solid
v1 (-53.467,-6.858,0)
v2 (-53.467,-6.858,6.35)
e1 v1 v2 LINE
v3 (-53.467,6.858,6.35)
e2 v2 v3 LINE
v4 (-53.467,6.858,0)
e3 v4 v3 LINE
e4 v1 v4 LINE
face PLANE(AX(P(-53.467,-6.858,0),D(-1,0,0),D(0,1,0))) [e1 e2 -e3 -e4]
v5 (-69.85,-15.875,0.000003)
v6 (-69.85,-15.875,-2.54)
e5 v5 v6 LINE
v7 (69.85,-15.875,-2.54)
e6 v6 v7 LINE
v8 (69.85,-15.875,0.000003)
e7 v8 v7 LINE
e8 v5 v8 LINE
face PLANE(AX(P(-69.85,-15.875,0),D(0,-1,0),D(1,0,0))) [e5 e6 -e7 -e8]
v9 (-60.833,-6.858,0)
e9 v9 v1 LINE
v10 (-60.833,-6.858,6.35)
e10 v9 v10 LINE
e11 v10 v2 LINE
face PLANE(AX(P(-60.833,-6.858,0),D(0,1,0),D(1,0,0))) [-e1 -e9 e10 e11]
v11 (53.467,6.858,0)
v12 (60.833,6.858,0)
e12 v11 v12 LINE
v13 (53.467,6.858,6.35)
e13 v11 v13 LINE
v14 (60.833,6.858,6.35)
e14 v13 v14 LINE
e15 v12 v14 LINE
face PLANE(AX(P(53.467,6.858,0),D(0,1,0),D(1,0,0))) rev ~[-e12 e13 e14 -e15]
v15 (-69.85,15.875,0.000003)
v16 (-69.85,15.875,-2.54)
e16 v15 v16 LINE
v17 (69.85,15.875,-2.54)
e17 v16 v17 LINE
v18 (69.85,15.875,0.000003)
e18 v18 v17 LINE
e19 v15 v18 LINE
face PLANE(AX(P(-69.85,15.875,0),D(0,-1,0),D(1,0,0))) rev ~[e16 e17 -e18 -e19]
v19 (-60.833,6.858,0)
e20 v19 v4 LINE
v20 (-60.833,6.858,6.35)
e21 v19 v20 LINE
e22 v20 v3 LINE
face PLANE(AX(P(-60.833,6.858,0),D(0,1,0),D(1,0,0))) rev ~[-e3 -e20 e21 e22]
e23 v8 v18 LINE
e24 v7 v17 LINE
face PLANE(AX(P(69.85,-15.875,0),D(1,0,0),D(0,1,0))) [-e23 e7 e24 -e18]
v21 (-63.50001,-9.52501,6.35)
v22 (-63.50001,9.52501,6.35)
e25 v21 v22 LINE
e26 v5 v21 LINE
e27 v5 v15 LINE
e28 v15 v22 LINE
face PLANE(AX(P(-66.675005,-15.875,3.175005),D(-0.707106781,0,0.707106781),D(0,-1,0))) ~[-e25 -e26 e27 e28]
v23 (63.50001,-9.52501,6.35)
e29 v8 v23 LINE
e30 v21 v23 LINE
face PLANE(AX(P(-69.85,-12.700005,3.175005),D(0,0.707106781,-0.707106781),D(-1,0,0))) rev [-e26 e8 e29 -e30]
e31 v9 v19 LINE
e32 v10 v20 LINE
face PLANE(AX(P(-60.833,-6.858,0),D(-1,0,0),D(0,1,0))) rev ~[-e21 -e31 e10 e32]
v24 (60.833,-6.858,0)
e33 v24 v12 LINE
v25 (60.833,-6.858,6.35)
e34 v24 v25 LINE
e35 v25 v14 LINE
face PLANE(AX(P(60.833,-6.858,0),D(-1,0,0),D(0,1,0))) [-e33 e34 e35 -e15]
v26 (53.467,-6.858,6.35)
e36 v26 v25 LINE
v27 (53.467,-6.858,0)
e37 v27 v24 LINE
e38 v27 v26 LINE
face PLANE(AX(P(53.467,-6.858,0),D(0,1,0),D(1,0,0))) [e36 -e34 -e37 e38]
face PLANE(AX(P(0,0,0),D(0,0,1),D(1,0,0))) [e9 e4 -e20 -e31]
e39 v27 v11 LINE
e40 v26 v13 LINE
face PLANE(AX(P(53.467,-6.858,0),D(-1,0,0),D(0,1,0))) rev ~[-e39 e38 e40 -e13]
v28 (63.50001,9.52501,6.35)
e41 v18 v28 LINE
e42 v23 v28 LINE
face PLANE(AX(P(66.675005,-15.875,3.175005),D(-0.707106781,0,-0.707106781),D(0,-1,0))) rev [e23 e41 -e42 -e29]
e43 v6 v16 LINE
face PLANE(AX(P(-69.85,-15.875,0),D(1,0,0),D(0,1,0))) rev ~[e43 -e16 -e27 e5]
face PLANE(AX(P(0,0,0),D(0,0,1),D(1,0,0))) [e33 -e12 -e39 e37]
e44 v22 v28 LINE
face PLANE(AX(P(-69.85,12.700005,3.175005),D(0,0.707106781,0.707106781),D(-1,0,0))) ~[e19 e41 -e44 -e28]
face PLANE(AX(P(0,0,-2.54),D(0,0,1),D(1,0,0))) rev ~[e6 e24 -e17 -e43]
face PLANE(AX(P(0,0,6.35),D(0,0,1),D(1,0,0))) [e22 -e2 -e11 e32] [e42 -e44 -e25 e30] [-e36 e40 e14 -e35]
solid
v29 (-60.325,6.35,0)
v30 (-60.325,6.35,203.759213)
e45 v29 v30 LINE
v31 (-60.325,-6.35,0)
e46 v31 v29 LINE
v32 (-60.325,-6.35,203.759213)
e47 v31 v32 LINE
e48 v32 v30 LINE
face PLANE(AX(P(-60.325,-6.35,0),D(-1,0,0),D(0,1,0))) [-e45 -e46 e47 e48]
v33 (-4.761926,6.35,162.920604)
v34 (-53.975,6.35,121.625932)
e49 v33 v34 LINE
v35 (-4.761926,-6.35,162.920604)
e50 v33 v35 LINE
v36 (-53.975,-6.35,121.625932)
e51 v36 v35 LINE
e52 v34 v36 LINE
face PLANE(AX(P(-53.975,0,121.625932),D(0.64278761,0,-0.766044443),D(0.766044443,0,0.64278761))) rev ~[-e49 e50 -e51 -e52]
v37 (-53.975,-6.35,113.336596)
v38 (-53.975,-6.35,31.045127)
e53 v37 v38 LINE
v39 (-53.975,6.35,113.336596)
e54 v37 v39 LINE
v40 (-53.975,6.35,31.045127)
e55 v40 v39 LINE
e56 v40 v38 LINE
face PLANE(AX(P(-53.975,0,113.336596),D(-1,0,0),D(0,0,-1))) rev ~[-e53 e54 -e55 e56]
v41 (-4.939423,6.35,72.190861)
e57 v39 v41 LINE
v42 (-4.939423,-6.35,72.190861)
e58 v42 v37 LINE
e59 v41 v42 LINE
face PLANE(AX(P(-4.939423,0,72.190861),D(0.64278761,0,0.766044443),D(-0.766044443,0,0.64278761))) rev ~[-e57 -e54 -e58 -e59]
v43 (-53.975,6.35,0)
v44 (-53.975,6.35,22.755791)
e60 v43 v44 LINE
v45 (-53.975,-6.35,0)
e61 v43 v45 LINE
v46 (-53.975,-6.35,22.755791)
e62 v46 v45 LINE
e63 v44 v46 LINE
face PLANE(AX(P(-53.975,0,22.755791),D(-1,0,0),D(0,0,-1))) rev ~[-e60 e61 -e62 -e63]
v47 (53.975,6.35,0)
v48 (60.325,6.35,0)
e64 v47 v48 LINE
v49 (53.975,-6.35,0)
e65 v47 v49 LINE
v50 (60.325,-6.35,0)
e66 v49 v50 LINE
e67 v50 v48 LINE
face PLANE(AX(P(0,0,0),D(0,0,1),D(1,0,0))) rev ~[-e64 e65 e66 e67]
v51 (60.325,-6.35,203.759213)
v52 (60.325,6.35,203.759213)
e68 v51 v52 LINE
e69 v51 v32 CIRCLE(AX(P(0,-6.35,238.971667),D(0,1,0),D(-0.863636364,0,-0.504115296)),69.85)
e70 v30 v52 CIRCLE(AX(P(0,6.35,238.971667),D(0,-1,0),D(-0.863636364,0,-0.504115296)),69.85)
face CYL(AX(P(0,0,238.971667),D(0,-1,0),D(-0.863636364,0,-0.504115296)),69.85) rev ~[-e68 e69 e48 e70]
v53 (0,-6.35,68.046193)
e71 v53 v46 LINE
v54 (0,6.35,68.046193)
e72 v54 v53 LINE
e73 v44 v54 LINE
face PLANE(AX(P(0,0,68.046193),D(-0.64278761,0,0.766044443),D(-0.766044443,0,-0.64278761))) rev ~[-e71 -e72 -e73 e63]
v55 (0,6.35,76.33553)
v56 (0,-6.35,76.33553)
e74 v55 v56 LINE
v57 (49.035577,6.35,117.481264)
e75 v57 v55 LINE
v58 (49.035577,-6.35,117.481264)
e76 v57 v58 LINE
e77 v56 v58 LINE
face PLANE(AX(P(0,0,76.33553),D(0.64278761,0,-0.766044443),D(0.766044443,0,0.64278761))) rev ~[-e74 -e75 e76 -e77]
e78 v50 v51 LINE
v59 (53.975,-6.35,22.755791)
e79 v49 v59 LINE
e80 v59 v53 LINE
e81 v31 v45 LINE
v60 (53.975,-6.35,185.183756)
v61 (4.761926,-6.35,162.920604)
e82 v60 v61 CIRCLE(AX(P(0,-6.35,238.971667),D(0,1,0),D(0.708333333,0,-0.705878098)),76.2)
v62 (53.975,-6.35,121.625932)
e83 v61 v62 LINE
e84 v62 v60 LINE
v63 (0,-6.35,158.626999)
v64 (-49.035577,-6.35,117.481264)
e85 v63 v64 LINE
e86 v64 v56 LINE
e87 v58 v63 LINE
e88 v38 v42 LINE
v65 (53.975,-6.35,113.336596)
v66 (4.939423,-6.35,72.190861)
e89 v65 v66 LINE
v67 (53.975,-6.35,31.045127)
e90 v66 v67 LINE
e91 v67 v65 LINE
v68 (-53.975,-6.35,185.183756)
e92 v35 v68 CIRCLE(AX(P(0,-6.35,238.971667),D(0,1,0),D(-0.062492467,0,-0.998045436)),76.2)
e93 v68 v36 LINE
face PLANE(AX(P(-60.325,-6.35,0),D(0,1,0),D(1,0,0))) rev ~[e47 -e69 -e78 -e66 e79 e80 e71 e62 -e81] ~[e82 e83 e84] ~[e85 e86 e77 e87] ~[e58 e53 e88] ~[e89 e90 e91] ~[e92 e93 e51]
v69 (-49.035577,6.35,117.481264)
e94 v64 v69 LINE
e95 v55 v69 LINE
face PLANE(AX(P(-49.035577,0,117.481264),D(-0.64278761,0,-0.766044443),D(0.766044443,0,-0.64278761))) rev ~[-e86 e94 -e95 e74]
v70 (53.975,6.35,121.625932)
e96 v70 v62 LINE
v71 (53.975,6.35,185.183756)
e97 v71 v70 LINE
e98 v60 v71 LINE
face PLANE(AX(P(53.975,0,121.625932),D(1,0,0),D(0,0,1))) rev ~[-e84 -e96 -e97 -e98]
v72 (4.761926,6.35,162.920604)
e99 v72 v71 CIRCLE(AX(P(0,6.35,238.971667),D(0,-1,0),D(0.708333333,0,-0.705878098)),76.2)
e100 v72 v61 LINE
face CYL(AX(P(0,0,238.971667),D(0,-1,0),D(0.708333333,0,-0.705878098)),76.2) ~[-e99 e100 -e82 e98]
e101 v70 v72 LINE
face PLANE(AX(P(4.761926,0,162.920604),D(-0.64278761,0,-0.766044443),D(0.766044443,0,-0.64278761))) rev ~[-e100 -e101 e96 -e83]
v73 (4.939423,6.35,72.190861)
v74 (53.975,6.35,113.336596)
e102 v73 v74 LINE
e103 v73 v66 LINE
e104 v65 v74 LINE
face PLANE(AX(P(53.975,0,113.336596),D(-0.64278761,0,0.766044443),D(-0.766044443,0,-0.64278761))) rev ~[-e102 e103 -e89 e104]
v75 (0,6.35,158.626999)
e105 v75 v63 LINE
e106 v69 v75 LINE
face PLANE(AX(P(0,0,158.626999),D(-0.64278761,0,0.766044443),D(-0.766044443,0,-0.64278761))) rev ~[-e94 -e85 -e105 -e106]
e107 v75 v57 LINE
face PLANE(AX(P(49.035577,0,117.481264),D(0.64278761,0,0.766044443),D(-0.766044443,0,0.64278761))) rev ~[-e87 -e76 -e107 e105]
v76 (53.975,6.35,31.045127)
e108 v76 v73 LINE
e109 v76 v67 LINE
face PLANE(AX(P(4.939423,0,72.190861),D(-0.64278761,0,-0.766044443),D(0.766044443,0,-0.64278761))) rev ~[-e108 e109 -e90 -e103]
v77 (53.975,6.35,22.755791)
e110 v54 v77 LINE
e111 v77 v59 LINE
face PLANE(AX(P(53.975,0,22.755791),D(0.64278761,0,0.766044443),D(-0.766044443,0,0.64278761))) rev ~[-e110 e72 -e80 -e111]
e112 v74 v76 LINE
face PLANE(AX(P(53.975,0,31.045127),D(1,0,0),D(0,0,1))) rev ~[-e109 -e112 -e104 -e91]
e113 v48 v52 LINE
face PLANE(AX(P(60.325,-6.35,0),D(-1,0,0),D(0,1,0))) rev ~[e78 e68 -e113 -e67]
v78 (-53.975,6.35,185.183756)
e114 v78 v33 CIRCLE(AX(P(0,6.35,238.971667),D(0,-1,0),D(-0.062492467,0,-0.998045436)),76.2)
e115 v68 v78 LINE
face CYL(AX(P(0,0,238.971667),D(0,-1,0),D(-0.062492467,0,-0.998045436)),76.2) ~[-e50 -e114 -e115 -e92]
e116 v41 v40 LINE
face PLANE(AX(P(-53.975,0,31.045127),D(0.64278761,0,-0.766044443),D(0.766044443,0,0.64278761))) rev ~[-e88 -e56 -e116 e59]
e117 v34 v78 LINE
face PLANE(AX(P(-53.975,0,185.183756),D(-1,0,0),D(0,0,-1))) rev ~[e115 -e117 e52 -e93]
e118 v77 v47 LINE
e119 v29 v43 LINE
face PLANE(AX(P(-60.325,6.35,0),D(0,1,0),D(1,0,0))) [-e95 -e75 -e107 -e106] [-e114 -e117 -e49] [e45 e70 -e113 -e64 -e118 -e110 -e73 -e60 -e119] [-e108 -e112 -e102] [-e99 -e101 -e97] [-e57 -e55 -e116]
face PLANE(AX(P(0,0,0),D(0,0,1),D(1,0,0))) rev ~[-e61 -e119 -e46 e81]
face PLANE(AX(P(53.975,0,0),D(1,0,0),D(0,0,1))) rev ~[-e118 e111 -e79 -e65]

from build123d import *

# Parameters (mm, degrees)
F0_W          = 120.65
F0_H          = 12.7
F1_DEPTH      = 228.6
F3_DEPTH      = 25.4
F3_DEPTH_BACK = 25.4
F4_W          = 139.7
F4_H          = 31.75
F4_W_2        = 7.366
F4_H_2        = 13.716
F5_DEPTH      = 6.35
F6_SIZE       = 6.34999
F7_DEPTH      = 2.54


# Not quite as in the source:
# - a fillet or chamfer is up to 0.001 mm smaller than in the source, because OpenCascade refuses the exact size


with BuildPart() as f1:
    # F0 (on Top) → F1 (new body)
    with BuildSketch(Plane.XY):
        Rectangle(F0_W, F0_H)
    extrude(amount=F1_DEPTH)

    # F2 (on Front) → F3 (cut, two sides)
    with BuildSketch(Plane.XZ) as f3_sk:
        with BuildLine():
            ThreePointArc((60.325, 203.7592132588), (67.4267148466, 220.7326802639), (69.85, 238.9716666667))
            ThreePointArc((69.85, 238.9716666667), (-18.2389864028, 306.3983815132), (-60.325, 203.7592132588))
            ThreePointArc((-60.325, 203.7592132588), (0, 169.1216666667), (60.325, 203.7592132588))
        make_face()
        with BuildLine():
            ThreePointArc((-4.7619259855, 162.9206044722), (-31.407301592, 169.5452926672), (-53.975, 185.1837556178))
            Line((-53.975, 185.1837556178), (-53.975, 121.6259322175))
            Line((-53.975, 121.6259322175), (-4.7619259855, 162.9206044722))
        make_face()
        with BuildLine():
            Line((53.975, 121.6259322175), (53.975, 185.1837556178))
            ThreePointArc((53.975, 185.1837556178), (31.407301592, 169.5452926672), (4.7619259855, 162.9206044722))
            Line((4.7619259855, 162.9206044722), (53.975, 121.6259322175))
        make_face()
        Polygon((0, 158.626998523), (-49.0355768497, 117.4812640739), (0, 76.3355296247), (49.0355768497, 117.4812640739), align=None)
        Polygon((-4.9394231503, 72.1908614811), (-53.975, 113.3365959302), (-53.975, 31.0451270319), align=None)
        Polygon((53.975, 31.0451270319), (53.975, 113.3365959302), (4.9394231503, 72.1908614811), align=None)
        Polygon((-53.975, 22.7557907447), (-53.975, 0), (53.975, 0), (53.975, 22.7557907447), (0, 68.0461933374), align=None)
    extrude(amount=-F3_DEPTH, mode=Mode.SUBTRACT)
    extrude(f3_sk.sketch, amount=F3_DEPTH_BACK, mode=Mode.SUBTRACT)


with BuildPart() as f5:
    # F4 (on Top) → F5 (new body)
    with BuildSketch(Plane.XY):
        Rectangle(F4_W, F4_H)
        with Locations((-57.15, 0)):
            Rectangle(F4_W_2, F4_H_2, mode=Mode.SUBTRACT)
        with Locations((57.15, 0)):
            Rectangle(F4_W_2, F4_H_2, mode=Mode.SUBTRACT)
    extrude(amount=F5_DEPTH)

    # F6 (size 6.35 in the source; OpenCascade refuses exactly that, so slightly less here)
    f6_edges = [f5.edges().sort_by_distance(p)[0] for p in [
        (0, -15.875, 6.35),
        (-69.85, 0, 6.35),
        (0, 15.875, 6.35),
        (69.85, 0, 6.35),
    ]]
    chamfer(f6_edges, length=F6_SIZE)

    # F4 (on Top) → F7 (join)
    with BuildSketch(Plane.XY):
        Rectangle(F4_W, F4_H)
        with Locations((-57.15, 0)):
            Rectangle(F4_W_2, F4_H_2, mode=Mode.SUBTRACT)
        with Locations((57.15, 0)):
            Rectangle(F4_W_2, F4_H_2, mode=Mode.SUBTRACT)
        with Locations((-57.15, 0)):
            Rectangle(F4_W_2, F4_H_2)
        with Locations((57.15, 0)):
            Rectangle(F4_W_2, F4_H_2)
    extrude(amount=-F7_DEPTH)


solid = Compound([f1.part, f5.part])
